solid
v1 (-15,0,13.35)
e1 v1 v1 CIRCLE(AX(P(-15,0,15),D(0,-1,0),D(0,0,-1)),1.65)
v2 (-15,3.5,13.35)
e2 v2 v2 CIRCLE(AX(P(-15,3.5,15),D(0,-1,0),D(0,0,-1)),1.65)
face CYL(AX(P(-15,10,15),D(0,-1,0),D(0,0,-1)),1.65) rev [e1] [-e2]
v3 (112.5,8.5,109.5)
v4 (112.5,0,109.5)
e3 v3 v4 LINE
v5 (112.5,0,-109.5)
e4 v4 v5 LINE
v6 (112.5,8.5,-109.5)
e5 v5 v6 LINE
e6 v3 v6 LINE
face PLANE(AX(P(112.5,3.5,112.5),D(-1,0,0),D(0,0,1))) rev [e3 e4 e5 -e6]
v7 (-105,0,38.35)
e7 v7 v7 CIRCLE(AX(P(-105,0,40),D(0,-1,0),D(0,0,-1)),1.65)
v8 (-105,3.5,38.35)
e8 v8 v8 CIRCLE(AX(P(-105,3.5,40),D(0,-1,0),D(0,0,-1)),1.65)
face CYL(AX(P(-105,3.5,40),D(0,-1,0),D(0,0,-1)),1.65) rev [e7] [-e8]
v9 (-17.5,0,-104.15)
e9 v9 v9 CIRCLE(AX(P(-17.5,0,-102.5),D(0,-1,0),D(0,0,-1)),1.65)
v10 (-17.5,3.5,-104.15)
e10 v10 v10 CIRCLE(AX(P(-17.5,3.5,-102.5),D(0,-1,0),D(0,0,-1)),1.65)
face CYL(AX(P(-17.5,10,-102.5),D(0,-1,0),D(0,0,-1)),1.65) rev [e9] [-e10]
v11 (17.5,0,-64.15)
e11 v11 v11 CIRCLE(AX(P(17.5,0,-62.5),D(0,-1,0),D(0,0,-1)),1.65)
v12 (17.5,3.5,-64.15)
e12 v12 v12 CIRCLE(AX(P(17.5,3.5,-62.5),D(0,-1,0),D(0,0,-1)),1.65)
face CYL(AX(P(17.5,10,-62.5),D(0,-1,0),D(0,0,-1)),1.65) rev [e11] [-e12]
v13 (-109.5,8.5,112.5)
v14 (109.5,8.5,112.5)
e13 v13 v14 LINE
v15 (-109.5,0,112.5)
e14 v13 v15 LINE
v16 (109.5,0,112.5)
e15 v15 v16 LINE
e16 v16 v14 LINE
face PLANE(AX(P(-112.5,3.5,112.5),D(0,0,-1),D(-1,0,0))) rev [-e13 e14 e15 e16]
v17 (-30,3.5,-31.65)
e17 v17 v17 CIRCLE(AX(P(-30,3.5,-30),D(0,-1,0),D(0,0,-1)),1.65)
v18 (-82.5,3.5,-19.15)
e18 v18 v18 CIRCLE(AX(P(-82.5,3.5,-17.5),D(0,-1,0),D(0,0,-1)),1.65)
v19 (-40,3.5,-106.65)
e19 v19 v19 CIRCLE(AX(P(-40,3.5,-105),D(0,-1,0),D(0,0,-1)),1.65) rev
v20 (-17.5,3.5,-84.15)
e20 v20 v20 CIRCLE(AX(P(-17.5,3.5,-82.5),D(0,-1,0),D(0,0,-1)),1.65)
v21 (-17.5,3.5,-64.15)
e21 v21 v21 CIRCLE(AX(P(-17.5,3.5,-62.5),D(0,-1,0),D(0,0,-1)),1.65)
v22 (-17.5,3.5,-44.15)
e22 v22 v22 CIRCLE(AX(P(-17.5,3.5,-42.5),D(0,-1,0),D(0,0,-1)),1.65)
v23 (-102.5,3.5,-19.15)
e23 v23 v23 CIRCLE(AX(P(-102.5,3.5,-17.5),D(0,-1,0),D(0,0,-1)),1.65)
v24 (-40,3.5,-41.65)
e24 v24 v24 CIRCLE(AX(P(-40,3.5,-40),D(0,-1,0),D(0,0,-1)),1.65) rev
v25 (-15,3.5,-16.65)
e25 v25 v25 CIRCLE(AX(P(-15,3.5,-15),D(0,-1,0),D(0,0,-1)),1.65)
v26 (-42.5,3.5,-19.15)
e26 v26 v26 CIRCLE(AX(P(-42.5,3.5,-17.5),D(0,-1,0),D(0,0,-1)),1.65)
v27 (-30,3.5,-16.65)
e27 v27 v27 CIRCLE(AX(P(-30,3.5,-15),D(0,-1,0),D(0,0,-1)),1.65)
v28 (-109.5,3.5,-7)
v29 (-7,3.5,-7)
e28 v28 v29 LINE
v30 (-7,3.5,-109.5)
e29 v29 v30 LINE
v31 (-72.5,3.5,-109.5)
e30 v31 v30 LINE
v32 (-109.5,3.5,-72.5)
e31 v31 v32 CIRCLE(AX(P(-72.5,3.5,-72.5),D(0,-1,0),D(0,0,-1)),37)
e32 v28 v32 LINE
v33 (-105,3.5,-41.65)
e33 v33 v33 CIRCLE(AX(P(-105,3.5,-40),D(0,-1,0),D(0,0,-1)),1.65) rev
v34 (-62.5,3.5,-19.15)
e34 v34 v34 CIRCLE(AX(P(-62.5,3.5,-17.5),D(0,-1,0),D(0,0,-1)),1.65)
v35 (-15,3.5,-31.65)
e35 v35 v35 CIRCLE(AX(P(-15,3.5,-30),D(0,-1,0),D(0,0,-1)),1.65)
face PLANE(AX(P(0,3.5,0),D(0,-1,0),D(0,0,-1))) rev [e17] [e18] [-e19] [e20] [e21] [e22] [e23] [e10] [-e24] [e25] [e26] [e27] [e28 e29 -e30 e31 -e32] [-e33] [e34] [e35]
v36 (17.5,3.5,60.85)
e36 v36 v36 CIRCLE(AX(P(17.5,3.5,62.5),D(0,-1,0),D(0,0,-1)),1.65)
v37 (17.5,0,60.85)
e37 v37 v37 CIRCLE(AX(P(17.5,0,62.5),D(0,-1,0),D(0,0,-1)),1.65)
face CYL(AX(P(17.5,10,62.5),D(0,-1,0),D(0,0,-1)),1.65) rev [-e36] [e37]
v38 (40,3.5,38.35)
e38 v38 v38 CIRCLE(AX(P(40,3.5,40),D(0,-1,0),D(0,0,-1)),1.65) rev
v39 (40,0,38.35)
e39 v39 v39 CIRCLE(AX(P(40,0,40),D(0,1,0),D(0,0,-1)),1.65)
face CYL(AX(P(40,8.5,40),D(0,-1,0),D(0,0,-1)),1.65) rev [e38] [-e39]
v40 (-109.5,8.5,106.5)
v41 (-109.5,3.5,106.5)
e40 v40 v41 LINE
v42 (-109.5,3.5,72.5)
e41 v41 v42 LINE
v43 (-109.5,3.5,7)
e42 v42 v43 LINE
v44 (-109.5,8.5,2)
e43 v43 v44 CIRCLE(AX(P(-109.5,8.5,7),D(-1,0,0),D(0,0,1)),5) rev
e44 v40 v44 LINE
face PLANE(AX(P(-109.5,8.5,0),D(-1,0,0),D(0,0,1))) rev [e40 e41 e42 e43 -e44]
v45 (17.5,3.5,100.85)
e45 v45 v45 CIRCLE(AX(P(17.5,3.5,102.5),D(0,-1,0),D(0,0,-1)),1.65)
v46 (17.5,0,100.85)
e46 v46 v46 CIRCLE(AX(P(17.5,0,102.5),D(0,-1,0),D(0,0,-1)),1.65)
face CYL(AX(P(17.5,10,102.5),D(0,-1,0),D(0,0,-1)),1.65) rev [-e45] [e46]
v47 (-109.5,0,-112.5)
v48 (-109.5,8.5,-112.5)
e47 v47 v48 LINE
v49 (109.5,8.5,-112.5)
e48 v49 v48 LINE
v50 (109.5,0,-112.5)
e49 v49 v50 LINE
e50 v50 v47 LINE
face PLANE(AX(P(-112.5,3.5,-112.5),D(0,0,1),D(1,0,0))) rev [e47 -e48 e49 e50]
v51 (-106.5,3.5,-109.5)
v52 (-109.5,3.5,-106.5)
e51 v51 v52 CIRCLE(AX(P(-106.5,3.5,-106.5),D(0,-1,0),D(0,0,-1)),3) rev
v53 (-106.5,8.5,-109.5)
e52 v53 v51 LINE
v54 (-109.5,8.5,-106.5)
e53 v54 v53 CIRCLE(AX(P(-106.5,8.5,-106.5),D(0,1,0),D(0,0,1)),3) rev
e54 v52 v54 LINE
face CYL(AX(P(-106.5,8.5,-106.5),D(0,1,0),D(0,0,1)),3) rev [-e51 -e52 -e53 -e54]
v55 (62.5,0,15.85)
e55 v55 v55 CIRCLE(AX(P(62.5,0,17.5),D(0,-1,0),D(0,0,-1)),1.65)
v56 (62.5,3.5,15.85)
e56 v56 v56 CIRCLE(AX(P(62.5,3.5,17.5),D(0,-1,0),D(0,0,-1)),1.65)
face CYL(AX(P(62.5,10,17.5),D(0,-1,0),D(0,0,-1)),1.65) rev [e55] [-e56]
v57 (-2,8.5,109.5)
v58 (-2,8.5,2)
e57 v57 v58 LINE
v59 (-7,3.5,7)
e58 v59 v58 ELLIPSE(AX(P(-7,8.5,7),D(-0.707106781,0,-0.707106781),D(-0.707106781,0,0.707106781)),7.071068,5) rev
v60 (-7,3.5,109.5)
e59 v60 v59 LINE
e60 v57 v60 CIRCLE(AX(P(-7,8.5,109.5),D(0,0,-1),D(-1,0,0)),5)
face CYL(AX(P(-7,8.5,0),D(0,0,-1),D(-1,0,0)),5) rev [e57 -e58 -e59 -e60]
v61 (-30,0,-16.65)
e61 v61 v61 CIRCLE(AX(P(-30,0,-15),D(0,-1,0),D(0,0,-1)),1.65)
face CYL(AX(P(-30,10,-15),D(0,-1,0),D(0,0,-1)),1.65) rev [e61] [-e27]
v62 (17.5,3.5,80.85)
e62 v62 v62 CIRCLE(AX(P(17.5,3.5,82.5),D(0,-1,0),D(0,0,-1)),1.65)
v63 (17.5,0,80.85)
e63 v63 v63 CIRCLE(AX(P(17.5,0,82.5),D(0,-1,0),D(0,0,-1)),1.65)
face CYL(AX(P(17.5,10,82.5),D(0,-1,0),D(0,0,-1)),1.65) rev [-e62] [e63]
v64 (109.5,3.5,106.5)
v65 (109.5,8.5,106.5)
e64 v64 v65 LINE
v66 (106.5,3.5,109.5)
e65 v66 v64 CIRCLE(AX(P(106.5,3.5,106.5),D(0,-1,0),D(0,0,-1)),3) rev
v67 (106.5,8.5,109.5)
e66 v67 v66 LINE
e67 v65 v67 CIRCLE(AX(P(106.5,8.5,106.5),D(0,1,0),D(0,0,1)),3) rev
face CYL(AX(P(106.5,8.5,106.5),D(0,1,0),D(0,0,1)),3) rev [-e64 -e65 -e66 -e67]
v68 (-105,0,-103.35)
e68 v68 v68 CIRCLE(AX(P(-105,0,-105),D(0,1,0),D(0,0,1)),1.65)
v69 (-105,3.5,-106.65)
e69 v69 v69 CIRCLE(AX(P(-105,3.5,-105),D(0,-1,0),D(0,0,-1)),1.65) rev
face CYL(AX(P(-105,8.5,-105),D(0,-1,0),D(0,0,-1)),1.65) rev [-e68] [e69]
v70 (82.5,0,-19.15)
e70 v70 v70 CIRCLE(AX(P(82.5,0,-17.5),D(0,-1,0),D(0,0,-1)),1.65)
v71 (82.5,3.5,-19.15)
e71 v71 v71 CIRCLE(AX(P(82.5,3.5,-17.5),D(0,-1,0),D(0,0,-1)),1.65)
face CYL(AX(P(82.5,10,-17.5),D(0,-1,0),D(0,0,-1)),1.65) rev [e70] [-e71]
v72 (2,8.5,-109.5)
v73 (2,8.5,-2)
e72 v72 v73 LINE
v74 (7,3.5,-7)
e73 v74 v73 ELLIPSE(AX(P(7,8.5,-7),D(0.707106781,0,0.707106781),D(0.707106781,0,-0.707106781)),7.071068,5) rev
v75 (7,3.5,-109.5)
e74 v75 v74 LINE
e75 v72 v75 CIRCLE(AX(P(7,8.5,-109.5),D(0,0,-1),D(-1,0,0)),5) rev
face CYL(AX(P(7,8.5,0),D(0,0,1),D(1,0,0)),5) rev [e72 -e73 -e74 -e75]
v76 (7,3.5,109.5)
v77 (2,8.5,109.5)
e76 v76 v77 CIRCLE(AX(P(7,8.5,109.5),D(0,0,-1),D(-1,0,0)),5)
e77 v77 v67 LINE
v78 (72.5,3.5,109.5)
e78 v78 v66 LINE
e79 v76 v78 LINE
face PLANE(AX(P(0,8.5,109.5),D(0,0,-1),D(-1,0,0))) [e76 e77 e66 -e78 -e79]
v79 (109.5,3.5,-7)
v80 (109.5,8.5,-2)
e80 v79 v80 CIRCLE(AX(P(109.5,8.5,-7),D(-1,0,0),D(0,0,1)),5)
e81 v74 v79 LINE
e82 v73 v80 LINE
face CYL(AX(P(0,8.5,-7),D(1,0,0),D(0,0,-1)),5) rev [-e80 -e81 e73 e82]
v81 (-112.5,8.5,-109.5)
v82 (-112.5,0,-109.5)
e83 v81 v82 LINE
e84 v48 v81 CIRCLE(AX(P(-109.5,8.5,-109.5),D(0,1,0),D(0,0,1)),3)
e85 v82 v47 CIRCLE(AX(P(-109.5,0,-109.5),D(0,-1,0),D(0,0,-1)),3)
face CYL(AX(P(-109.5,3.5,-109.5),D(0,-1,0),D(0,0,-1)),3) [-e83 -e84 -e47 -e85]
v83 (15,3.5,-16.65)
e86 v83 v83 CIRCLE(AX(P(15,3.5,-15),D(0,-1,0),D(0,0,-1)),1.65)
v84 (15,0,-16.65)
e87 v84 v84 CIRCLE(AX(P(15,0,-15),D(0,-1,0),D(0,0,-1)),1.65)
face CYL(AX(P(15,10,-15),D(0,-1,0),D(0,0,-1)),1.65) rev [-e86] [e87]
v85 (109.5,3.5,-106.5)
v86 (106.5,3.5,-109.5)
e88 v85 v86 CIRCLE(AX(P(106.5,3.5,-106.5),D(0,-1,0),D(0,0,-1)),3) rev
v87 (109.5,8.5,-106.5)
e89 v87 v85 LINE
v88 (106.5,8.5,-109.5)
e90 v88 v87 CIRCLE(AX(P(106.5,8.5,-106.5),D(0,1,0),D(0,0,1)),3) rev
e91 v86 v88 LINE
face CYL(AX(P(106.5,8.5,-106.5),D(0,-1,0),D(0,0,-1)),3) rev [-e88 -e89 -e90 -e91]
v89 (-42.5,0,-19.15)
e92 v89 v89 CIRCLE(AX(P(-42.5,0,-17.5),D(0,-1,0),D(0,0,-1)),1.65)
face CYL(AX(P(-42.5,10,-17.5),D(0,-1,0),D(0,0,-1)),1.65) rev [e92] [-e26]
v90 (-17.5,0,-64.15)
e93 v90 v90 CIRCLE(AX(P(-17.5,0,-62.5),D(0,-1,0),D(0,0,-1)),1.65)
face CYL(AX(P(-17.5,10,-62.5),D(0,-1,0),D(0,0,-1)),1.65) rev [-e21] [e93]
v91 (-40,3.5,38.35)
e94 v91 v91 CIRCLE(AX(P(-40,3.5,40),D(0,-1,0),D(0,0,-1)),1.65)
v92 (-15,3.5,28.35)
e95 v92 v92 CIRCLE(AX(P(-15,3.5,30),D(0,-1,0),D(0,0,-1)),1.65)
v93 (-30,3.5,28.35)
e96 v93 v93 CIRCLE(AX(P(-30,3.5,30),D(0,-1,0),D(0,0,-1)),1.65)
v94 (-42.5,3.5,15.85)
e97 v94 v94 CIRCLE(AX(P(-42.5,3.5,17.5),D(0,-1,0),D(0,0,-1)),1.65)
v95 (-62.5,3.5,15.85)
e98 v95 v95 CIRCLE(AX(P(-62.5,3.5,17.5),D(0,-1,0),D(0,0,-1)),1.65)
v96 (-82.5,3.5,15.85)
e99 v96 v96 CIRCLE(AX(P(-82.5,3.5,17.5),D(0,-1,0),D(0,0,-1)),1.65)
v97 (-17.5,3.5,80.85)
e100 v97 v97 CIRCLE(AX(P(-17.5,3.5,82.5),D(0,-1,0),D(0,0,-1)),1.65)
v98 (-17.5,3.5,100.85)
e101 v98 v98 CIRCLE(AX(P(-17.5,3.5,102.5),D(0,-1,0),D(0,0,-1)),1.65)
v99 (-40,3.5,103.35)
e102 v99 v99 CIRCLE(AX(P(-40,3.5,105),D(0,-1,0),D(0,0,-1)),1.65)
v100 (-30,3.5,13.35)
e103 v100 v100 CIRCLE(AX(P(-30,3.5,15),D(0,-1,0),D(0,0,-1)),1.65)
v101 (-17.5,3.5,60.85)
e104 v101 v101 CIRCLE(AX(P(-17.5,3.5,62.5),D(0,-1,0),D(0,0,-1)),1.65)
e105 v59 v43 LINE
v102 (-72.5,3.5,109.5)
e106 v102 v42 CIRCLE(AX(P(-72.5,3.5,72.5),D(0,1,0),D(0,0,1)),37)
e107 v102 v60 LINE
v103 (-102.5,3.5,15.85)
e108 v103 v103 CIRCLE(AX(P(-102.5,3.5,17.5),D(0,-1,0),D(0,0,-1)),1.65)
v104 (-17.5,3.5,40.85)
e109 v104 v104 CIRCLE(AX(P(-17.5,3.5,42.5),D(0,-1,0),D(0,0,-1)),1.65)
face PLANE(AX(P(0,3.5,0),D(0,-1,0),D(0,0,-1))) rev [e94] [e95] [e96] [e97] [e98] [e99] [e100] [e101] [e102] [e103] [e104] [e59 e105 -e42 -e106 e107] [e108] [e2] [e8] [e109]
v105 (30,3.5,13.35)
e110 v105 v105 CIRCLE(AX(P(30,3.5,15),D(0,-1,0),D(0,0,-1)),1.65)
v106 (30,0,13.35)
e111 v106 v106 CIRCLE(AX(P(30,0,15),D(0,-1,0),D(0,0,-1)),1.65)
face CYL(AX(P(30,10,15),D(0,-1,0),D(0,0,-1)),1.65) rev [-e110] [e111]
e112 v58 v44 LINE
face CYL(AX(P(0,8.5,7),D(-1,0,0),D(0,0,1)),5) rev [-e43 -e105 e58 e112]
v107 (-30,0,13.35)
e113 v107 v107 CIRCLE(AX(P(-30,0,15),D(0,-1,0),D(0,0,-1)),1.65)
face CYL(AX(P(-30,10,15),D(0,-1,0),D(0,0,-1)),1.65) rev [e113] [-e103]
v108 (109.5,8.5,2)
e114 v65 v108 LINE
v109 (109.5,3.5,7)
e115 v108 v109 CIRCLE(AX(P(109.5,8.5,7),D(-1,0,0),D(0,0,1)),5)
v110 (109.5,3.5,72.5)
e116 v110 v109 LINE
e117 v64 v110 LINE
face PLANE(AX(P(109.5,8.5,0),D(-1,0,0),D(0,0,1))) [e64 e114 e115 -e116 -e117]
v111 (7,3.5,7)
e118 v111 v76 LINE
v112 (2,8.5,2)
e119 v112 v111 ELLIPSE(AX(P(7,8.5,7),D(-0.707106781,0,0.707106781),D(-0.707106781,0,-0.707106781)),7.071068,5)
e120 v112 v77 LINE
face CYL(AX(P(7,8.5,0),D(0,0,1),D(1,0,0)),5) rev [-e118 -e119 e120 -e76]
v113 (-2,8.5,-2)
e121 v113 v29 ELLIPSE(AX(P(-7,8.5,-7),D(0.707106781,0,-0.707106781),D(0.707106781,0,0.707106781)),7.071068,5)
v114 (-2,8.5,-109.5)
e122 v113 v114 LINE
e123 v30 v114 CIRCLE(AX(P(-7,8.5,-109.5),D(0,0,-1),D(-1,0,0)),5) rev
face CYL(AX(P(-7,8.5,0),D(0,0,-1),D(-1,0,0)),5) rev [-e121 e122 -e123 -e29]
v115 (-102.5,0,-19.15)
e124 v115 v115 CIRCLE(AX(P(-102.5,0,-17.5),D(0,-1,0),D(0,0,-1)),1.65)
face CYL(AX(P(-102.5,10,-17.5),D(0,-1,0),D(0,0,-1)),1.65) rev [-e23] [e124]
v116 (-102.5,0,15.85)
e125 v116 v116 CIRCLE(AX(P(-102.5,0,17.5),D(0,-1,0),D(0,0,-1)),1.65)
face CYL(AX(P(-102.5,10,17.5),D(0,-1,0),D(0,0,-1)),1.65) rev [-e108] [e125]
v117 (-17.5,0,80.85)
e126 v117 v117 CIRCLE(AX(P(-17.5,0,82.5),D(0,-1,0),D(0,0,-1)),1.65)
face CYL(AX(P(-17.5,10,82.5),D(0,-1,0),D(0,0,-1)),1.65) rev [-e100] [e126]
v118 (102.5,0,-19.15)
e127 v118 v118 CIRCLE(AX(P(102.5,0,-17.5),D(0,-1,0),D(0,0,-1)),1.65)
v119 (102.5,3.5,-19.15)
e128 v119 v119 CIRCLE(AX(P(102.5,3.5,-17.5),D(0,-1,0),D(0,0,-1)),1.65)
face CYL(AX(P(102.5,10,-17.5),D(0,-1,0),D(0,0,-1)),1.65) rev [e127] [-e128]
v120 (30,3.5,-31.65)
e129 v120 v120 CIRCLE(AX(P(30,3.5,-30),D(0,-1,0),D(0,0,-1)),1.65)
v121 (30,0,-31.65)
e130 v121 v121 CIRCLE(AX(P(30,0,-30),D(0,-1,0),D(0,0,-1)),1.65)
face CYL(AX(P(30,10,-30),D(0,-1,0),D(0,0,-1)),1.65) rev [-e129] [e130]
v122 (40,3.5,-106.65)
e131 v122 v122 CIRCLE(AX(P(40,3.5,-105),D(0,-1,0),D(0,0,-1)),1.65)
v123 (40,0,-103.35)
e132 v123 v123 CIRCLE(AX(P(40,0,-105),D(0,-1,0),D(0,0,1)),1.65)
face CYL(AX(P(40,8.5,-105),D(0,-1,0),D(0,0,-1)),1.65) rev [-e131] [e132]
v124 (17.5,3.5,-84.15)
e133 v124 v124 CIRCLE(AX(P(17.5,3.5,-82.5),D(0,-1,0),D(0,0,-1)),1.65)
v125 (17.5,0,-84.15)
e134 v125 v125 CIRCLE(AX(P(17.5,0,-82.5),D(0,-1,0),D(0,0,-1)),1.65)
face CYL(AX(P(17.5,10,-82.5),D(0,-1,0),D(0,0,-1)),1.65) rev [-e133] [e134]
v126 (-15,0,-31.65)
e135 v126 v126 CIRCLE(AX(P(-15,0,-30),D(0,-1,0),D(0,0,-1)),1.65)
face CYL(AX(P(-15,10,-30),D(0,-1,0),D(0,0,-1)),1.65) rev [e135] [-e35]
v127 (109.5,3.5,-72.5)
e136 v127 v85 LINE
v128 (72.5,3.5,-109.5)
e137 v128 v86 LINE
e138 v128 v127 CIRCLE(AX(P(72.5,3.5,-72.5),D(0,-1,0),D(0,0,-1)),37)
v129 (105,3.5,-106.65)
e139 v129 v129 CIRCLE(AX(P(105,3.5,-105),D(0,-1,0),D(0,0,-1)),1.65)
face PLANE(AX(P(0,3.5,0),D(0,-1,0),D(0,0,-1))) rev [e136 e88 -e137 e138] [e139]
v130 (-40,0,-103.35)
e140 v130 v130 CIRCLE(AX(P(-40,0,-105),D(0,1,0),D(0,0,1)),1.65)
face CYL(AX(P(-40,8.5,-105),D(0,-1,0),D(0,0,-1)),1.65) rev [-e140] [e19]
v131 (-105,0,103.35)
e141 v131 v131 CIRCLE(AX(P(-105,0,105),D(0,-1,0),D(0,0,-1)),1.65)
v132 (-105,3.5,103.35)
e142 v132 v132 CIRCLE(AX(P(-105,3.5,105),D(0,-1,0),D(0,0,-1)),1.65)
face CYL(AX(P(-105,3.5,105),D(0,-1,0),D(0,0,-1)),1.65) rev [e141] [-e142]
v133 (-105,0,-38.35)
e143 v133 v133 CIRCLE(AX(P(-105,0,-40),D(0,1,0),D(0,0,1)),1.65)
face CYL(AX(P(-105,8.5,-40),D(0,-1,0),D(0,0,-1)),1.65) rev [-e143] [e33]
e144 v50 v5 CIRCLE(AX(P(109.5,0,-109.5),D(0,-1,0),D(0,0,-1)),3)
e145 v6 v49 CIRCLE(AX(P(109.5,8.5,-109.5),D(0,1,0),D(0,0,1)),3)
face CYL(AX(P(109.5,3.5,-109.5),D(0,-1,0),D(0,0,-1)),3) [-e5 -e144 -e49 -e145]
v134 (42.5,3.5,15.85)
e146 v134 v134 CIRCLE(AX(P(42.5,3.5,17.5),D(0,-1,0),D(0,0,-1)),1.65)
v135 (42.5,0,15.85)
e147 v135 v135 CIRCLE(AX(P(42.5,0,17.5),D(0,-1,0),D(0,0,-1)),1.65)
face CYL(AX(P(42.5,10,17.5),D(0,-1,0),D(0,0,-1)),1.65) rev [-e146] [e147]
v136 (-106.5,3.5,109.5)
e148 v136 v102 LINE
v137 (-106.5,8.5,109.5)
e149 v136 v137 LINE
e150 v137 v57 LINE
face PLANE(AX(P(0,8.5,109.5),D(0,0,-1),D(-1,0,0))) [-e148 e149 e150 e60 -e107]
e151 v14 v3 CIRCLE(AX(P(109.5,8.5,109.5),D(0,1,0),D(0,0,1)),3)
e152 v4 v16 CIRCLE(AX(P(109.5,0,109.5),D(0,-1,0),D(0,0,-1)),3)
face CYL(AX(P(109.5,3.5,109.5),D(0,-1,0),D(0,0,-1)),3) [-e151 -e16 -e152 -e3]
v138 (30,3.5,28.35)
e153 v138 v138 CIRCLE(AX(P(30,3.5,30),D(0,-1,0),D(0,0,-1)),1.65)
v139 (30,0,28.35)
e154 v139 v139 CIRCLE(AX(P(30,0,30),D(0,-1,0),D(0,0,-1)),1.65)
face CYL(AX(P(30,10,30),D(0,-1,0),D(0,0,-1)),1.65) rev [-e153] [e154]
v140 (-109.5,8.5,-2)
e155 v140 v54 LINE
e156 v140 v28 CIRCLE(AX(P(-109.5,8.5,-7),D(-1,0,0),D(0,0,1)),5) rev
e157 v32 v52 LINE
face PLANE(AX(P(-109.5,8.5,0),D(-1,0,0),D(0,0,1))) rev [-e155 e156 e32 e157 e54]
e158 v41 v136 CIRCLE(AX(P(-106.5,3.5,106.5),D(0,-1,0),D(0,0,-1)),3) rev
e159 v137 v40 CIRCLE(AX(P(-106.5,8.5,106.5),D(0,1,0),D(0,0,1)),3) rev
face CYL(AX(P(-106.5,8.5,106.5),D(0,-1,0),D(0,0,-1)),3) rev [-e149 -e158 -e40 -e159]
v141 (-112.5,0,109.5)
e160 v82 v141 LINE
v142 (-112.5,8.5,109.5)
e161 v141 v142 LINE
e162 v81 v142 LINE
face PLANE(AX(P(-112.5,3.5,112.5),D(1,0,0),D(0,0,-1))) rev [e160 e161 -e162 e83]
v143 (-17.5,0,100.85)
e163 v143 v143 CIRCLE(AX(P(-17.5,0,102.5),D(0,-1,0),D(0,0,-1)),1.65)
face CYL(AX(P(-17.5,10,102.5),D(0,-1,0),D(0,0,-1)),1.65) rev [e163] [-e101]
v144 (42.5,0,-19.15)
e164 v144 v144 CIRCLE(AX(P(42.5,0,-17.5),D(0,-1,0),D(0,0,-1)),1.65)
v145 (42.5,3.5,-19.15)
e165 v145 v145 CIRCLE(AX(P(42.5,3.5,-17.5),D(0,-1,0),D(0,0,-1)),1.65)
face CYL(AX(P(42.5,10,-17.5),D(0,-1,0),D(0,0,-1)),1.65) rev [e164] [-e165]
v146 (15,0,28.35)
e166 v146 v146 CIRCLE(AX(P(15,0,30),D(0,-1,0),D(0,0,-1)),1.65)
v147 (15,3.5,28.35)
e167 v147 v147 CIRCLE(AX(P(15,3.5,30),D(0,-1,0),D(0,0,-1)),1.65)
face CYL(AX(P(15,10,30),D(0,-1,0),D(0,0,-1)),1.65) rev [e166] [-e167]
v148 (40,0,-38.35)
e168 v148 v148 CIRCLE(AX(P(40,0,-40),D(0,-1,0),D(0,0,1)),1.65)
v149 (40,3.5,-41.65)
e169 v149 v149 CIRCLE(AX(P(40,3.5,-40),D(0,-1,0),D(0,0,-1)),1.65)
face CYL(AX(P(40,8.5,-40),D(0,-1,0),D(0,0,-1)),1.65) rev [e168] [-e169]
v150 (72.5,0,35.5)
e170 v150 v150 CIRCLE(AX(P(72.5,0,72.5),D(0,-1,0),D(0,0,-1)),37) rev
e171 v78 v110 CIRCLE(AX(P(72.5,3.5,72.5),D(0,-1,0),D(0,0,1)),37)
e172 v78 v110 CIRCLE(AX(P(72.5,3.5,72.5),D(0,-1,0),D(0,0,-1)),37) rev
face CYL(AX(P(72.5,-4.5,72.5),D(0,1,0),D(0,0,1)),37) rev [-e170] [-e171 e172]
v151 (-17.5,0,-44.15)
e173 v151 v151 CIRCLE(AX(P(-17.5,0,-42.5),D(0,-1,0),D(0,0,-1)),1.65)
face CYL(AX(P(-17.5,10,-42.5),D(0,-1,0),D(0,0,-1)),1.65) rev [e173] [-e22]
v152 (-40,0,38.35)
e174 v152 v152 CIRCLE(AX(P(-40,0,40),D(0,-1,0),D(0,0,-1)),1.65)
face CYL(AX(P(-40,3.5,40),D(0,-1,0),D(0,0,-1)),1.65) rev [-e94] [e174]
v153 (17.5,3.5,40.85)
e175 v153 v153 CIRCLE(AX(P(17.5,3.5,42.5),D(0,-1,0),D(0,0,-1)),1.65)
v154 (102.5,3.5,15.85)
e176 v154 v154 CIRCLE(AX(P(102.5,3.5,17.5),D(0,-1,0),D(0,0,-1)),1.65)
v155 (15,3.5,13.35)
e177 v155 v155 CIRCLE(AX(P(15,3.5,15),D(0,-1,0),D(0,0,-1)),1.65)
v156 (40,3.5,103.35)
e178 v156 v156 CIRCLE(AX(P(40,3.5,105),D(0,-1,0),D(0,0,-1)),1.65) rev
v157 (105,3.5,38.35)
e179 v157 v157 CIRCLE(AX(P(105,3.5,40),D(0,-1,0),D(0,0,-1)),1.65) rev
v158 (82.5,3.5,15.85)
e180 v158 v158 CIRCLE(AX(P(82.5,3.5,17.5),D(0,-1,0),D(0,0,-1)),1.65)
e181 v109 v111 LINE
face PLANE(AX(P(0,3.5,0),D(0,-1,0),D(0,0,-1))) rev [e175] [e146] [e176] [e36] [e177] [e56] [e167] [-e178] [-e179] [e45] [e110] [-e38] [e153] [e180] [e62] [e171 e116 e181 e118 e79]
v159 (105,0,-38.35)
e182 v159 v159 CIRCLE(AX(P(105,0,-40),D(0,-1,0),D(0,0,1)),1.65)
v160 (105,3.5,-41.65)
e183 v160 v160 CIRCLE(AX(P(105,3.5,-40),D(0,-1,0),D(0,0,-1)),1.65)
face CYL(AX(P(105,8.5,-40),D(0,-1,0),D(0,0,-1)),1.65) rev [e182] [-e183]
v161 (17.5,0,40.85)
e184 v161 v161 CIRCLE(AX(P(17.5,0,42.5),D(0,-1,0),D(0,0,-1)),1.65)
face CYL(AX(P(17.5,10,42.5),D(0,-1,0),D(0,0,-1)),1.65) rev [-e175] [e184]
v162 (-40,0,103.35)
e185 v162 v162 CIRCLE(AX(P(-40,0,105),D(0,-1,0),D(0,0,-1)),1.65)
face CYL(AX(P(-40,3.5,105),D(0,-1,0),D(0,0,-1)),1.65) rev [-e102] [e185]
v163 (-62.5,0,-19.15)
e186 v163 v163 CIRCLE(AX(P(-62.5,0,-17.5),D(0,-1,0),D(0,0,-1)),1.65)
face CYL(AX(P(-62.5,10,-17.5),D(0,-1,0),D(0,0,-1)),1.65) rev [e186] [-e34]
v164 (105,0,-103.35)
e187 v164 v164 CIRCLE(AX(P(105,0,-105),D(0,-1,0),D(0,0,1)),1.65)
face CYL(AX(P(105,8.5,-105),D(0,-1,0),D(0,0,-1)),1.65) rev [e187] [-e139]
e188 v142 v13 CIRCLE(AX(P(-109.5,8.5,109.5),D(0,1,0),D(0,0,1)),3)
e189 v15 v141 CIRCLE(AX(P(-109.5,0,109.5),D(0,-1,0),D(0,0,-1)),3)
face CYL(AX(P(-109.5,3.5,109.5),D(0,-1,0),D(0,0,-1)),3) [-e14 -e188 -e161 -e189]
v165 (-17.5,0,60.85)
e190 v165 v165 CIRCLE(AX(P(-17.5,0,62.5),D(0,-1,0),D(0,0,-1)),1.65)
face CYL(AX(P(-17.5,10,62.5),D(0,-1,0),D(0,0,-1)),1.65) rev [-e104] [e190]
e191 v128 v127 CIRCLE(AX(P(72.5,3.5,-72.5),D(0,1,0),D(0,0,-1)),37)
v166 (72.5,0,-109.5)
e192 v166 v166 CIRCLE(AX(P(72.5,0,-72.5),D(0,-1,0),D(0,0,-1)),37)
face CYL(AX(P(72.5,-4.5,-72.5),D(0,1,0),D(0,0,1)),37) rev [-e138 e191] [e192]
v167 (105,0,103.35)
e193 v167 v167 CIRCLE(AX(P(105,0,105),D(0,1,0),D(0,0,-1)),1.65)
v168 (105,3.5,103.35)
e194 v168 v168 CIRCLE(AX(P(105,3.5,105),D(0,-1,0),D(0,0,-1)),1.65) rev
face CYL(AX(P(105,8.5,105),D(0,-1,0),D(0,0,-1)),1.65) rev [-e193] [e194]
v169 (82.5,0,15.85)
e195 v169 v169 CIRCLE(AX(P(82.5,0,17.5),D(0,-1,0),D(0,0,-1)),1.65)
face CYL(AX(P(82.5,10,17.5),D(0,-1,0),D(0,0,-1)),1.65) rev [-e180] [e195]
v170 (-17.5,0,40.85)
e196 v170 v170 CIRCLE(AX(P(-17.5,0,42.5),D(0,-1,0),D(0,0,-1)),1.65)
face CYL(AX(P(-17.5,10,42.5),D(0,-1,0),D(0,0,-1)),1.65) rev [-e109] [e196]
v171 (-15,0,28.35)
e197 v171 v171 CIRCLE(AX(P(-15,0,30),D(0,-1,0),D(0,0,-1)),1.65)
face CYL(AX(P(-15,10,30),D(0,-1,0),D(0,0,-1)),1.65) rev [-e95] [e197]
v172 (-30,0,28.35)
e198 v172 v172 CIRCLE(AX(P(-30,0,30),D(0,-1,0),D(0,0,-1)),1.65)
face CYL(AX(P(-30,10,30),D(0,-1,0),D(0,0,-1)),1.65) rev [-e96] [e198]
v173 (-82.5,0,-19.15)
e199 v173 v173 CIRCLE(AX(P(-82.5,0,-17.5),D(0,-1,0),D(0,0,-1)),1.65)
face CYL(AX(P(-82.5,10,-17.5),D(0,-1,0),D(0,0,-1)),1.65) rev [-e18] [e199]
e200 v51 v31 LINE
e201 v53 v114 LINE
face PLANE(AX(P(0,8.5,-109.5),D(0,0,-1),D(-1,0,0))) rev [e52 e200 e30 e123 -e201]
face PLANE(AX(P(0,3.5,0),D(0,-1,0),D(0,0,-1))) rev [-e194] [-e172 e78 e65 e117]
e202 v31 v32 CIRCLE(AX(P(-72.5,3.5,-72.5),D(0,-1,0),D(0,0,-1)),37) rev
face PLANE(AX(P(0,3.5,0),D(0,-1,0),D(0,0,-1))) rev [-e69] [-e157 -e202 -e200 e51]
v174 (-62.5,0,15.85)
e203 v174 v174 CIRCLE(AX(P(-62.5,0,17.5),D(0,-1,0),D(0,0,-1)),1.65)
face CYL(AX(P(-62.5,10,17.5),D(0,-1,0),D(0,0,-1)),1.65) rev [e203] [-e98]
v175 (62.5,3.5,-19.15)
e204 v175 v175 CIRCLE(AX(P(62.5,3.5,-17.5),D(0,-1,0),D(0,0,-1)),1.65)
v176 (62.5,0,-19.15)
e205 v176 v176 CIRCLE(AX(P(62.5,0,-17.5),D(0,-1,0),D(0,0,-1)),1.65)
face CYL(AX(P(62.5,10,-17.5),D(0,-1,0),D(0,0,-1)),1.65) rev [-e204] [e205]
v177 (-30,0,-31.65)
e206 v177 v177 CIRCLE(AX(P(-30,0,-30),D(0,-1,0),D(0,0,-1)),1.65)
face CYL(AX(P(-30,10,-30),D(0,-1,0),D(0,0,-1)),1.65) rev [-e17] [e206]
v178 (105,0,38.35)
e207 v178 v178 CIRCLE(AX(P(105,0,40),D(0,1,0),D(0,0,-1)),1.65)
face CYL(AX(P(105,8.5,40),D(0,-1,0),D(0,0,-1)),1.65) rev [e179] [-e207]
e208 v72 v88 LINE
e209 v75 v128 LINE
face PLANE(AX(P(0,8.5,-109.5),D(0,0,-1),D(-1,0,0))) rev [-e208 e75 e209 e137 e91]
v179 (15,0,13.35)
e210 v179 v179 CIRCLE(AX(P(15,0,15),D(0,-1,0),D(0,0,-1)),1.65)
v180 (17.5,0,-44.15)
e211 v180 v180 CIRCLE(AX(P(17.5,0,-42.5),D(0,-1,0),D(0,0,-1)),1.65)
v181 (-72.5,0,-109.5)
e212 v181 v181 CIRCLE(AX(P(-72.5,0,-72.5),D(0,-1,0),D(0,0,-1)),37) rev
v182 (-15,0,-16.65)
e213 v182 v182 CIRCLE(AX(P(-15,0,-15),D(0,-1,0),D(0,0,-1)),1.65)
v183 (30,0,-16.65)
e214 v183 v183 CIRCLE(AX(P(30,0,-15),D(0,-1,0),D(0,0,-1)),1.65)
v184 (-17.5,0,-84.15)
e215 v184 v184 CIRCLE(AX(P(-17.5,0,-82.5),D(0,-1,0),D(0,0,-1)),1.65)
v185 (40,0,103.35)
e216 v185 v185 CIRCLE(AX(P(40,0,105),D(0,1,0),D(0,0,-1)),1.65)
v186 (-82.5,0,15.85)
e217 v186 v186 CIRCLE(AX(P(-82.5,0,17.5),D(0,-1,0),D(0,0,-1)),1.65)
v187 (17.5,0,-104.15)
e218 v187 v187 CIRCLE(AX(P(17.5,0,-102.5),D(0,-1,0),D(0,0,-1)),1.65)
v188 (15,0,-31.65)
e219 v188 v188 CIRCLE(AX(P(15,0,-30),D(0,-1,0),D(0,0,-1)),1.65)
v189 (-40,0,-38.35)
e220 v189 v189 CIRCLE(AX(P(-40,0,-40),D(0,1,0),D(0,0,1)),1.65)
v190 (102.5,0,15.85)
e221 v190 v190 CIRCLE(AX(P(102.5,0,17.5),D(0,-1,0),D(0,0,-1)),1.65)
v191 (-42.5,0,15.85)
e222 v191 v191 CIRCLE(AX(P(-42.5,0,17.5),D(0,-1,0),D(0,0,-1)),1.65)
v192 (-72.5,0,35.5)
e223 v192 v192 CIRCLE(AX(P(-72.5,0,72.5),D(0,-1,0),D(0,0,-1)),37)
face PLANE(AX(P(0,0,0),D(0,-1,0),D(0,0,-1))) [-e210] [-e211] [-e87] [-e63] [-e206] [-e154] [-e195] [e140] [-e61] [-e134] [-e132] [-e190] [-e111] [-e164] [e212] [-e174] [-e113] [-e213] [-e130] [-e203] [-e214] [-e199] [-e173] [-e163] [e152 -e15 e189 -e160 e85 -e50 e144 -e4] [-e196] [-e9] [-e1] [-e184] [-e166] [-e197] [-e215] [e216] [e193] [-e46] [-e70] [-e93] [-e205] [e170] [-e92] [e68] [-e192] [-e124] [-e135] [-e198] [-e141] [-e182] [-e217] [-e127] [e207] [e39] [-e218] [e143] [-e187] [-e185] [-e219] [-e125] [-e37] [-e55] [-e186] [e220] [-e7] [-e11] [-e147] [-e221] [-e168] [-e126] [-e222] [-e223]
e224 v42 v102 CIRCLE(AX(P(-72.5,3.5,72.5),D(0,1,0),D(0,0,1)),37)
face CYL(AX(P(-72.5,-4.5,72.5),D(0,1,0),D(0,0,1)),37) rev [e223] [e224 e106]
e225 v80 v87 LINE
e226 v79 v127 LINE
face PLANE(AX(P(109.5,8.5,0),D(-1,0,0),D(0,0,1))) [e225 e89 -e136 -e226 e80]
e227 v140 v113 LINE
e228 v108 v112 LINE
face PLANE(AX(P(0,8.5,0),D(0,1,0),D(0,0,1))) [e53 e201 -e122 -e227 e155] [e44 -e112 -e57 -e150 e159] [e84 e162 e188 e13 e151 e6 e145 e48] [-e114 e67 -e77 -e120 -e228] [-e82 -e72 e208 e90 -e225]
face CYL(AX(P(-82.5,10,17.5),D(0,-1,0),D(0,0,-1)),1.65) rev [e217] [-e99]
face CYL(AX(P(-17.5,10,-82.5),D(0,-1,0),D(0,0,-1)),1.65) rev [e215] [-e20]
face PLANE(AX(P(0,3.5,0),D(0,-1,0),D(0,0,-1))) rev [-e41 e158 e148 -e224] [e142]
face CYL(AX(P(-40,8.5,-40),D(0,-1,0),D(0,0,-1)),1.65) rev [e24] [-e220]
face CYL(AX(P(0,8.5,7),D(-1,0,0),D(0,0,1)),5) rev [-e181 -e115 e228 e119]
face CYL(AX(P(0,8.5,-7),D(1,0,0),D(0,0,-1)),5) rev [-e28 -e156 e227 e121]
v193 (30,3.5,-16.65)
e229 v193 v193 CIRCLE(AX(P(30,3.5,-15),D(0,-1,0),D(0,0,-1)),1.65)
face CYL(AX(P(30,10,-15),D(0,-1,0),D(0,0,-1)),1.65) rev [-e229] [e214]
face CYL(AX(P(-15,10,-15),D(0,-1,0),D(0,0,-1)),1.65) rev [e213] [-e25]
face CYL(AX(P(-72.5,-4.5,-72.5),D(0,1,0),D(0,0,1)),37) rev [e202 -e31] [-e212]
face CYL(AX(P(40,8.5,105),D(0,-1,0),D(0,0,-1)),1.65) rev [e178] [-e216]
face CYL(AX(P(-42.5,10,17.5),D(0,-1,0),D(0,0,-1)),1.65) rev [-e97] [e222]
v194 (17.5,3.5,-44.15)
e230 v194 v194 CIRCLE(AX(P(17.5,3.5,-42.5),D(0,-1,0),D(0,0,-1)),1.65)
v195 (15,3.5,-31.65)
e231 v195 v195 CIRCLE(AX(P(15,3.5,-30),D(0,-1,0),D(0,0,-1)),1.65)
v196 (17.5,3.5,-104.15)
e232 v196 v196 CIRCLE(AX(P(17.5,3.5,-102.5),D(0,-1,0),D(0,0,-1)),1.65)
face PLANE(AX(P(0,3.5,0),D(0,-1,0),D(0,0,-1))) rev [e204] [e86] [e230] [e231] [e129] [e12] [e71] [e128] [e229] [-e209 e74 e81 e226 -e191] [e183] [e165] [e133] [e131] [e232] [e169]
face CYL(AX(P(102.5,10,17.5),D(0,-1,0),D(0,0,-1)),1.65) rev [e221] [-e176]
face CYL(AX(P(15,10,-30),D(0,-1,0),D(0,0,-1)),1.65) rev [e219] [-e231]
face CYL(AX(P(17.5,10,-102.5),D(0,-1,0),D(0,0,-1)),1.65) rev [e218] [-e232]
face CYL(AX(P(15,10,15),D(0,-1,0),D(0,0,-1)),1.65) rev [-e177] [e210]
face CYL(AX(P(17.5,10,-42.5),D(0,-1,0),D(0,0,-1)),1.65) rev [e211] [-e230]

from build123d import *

# Parameters (mm, degrees)
SKETCH_1_W               = 225
SKETCH_1_H               = 225
EXTRUDE_1_DEPTH          = 3.5
SKETCH_2_R               = 37
CUT_EXTRUDE_1_DEPTH      = 8
SKETCH_4_R               = 1.65
CUT_EXTRUDE_2_DEPTH      = 160.137519146
SKETCH_3_W               = 225
SKETCH_3_H               = 225
SKETCH_3_W_2             = 219
SKETCH_3_H_2             = 219
EXTRUDE_1975_DEPTH       = 5
SKETCH_5_R               = 1.65
CUT_EXTRUDE_2992_DEPTH   = 10
MIRROR_2_COPY_1_SKETCH_R = 37
MIRROR_2_COPY_1_DEPTH    = 8
MIRROR_2_COPY_2_SKETCH_R = 1.65
MIRROR_2_COPY_2_DEPTH    = 160.137519146
FILLET_1_R               = 5
FILLET_2_R               = 3
SKETCH_6_R               = 1.65
CUT_EXTRUDE_3_DEPTH      = 10


with BuildPart() as part:
    # 草图1 → 凸台-拉伸1 (new body)
    with BuildSketch(Plane(origin=(0, 0, 0), x_dir=(1, 0, 0), z_dir=(0, 1, 0))):
        Rectangle(SKETCH_1_W, SKETCH_1_H)
    extrude(amount=EXTRUDE_1_DEPTH)

    # 草图2 → 切除-拉伸1 (cut)
    with BuildSketch(Plane(origin=(0, 3.5, 0), x_dir=(1, 0, 0), z_dir=(0, 1, 0))):
        with Locations(Location((-72.5, -72.5, 0), (0, 0, 270))):
            Circle(SKETCH_2_R)
    cut_extrude_1 = extrude(amount=-CUT_EXTRUDE_1_DEPTH, mode=Mode.SUBTRACT)

    # 草图4 → 切除-拉伸2 (cut, through all)
    with BuildSketch(Plane.XZ):
        with Locations(Location((-40, 40, 0), (0, 0, 270))):
            Circle(SKETCH_4_R)
        with Locations(Location((-105, 40, 0), (0, 0, 270))):
            Circle(SKETCH_4_R)
        with Locations(Location((-105, 105, 0), (0, 0, 270))):
            Circle(SKETCH_4_R)
        with Locations(Location((-40, 105, 0), (0, 0, 270))):
            Circle(SKETCH_4_R)
    cut_extrude_2 = extrude(amount=-CUT_EXTRUDE_2_DEPTH, mode=Mode.SUBTRACT)

    # 草图3 → Extrude 1975 (add)
    # profile 1 of 2: a face of its own
    with BuildSketch(Plane(origin=(0, 3.5, 0), x_dir=(1, 0, 0), z_dir=(0, 1, 0))):
        Rectangle(SKETCH_3_W, SKETCH_3_H)
        Rectangle(SKETCH_3_W_2, SKETCH_3_H_2, mode=Mode.SUBTRACT)
    # profile 2 of 2: a face of its own
    with BuildSketch(Plane(origin=(0, 3.5, 0), x_dir=(1, 0, 0), z_dir=(0, 1, 0))):
        Polygon((2, 109.5), (2, 2), (109.5, 2), (109.5, -2), (2, -2), (2, -109.5), (-2, -109.5), (-2, -2), (-109.5, -2), (-109.5, 2), (-2, 2), (-2, 109.5), align=None)
    extrude(amount=EXTRUDE_1975_DEPTH)

    # 草图5 → Cut-Extrude 2992 (cut)
    with BuildSketch(Plane.XZ):
        with Locations(Location((-102.5, 17.5, 0), (0, 0, 270))):
            Circle(SKETCH_5_R)
        with Locations(Location((-102.5, -17.5, 0), (0, 0, 270))):
            Circle(SKETCH_5_R)
        with Locations(Location((-82.5, 17.5, 0), (0, 0, 270))):
            Circle(SKETCH_5_R)
        with Locations(Location((-82.5, -17.5, 0), (0, 0, 270))):
            Circle(SKETCH_5_R)
        with Locations(Location((-62.5, 17.5, 0), (0, 0, 270))):
            Circle(SKETCH_5_R)
        with Locations(Location((-62.5, -17.5, 0), (0, 0, 270))):
            Circle(SKETCH_5_R)
        with Locations(Location((-42.5, 17.5, 0), (0, 0, 270))):
            Circle(SKETCH_5_R)
        with Locations(Location((-42.5, -17.5, 0), (0, 0, 270))):
            Circle(SKETCH_5_R)
        with Locations(Location((17.5, 42.5, 0), (0, 0, 270))):
            Circle(SKETCH_5_R)
        with Locations(Location((-17.5, 42.5, 0), (0, 0, 270))):
            Circle(SKETCH_5_R)
        with Locations(Location((-17.5, 62.5, 0), (0, 0, 270))):
            Circle(SKETCH_5_R)
        with Locations(Location((17.5, 62.5, 0), (0, 0, 270))):
            Circle(SKETCH_5_R)
        with Locations(Location((17.5, 82.5, 0), (0, 0, 270))):
            Circle(SKETCH_5_R)
        with Locations(Location((-17.5, 82.5, 0), (0, 0, 270))):
            Circle(SKETCH_5_R)
        with Locations(Location((-17.5, 102.5, 0), (0, 0, 270))):
            Circle(SKETCH_5_R)
        with Locations(Location((17.5, 102.5, 0), (0, 0, 270))):
            Circle(SKETCH_5_R)
        with Locations(Location((42.5, -17.5, 0), (0, 0, 270))):
            Circle(SKETCH_5_R)
        with Locations(Location((42.5, 17.5, 0), (0, 0, 270))):
            Circle(SKETCH_5_R)
        with Locations(Location((62.5, 17.5, 0), (0, 0, 270))):
            Circle(SKETCH_5_R)
        with Locations(Location((62.5, -17.5, 0), (0, 0, 270))):
            Circle(SKETCH_5_R)
        with Locations(Location((82.5, -17.5, 0), (0, 0, 270))):
            Circle(SKETCH_5_R)
        with Locations(Location((82.5, 17.5, 0), (0, 0, 270))):
            Circle(SKETCH_5_R)
        with Locations(Location((102.5, 17.5, 0), (0, 0, 270))):
            Circle(SKETCH_5_R)
        with Locations(Location((102.5, -17.5, 0), (0, 0, 270))):
            Circle(SKETCH_5_R)
        with Locations(Location((-17.5, -42.5, 0), (0, 0, 270))):
            Circle(SKETCH_5_R)
        with Locations(Location((17.5, -42.5, 0), (0, 0, 270))):
            Circle(SKETCH_5_R)
        with Locations(Location((17.5, -62.5, 0), (0, 0, 270))):
            Circle(SKETCH_5_R)
        with Locations(Location((-17.5, -62.5, 0), (0, 0, 270))):
            Circle(SKETCH_5_R)
        with Locations(Location((-17.5, -82.5, 0), (0, 0, 270))):
            Circle(SKETCH_5_R)
        with Locations(Location((17.5, -82.5, 0), (0, 0, 270))):
            Circle(SKETCH_5_R)
        with Locations(Location((17.5, -102.5, 0), (0, 0, 270))):
            Circle(SKETCH_5_R)
        with Locations(Location((-17.5, -102.5, 0), (0, 0, 270))):
            Circle(SKETCH_5_R)
    extrude(amount=-CUT_EXTRUDE_2992_DEPTH, mode=Mode.SUBTRACT)

    # 镜向1: 切除-拉伸1, 切除-拉伸2 across plane
    add(cut_extrude_1.mirror(Plane(origin=(0, 0, 0), x_dir=(0, 0, 1), z_dir=(1, 0, 0))), mode=Mode.SUBTRACT)
    add(cut_extrude_2.mirror(Plane(origin=(0, 0, 0), x_dir=(0, 0, 1), z_dir=(1, 0, 0))), mode=Mode.SUBTRACT)

    # 镜向2: 切除-拉伸1, 切除-拉伸2 across plane
    add(cut_extrude_1.mirror(Plane.XY), mode=Mode.SUBTRACT)
    add(cut_extrude_2.mirror(Plane.XY), mode=Mode.SUBTRACT)

    # 镜向2 copy 1 sketch → 镜向2 copy 1 (cut)
    with BuildSketch(Plane(origin=(0, 3.5, 0), x_dir=(-1, 0, 0), z_dir=(0, 1, 0))):
        with Locations(Location((-72.5, -72.5, 0), (0, 0, 270))):
            Circle(MIRROR_2_COPY_1_SKETCH_R)
    extrude(amount=-MIRROR_2_COPY_1_DEPTH, mode=Mode.SUBTRACT)

    # 镜向2 copy 2 sketch → 镜向2 copy 2 (cut, through all)
    with BuildSketch(Plane(origin=(0, 0, 0), x_dir=(-1, 0, 0), z_dir=(0, -1, 0))):
        with Locations(Location((-40, 40, 0), (0, 0, 270))):
            Circle(MIRROR_2_COPY_2_SKETCH_R)
        with Locations(Location((-105, 40, 0), (0, 0, 270))):
            Circle(MIRROR_2_COPY_2_SKETCH_R)
        with Locations(Location((-105, 105, 0), (0, 0, 270))):
            Circle(MIRROR_2_COPY_2_SKETCH_R)
        with Locations(Location((-40, 105, 0), (0, 0, 270))):
            Circle(MIRROR_2_COPY_2_SKETCH_R)
    extrude(amount=-MIRROR_2_COPY_2_DEPTH, mode=Mode.SUBTRACT)

    # 圆角1
    fillet_1_edges = [part.edges().sort_by_distance(p)[0] for p in [
        (-55.75, 3.5, -2),
        (55.75, 3.5, -2),
        (55.75, 3.5, 2),
        (-55.75, 3.5, 2),
        (-2, 3.5, 55.75),
        (2, 3.5, 55.75),
        (2, 3.5, -55.75),
        (-2, 3.5, -55.75),
    ]]
    fillet(fillet_1_edges, radius=FILLET_1_R - 0.0001)  # a hair under: the kernel refuses the full size

    # 圆角2
    fillet_2_edges = [part.edges().sort_by_distance(p)[0] for p in [
        (109.5, 6, 109.5),
        (-109.5, 6, 109.5),
        (-109.5, 6, -109.5),
        (109.5, 6, -109.5),
        (112.5, 4.25, 112.5),
        (-112.5, 4.25, 112.5),
        (-112.5, 4.25, -112.5),
        (112.5, 4.25, -112.5),
    ]]
    fillet(fillet_2_edges, radius=FILLET_2_R)

    # 草图6 → 切除-拉伸3 (cut)
    with BuildSketch(Plane.XZ):
        with Locations(Location((-30, 30, 0), (0, 0, 270))):
            Circle(SKETCH_6_R)
        with Locations(Location((-15, 30, 0), (0, 0, 270))):
            Circle(SKETCH_6_R)
        with Locations(Location((15, 30, 0), (0, 0, 270))):
            Circle(SKETCH_6_R)
        with Locations(Location((30, 30, 0), (0, 0, 270))):
            Circle(SKETCH_6_R)
        with Locations(Location((-15, 15, 0), (0, 0, 270))):
            Circle(SKETCH_6_R)
        with Locations(Location((15, 15, 0), (0, 0, 270))):
            Circle(SKETCH_6_R)
        with Locations(Location((30, 15, 0), (0, 0, 270))):
            Circle(SKETCH_6_R)
        with Locations(Location((-15, -15, 0), (0, 0, 270))):
            Circle(SKETCH_6_R)
        with Locations(Location((15, -15, 0), (0, 0, 270))):
            Circle(SKETCH_6_R)
        with Locations(Location((30, -15, 0), (0, 0, 270))):
            Circle(SKETCH_6_R)
        with Locations(Location((-15, -30, 0), (0, 0, 270))):
            Circle(SKETCH_6_R)
        with Locations(Location((15, -30, 0), (0, 0, 270))):
            Circle(SKETCH_6_R)
        with Locations(Location((30, -30, 0), (0, 0, 270))):
            Circle(SKETCH_6_R)
        with Locations(Location((-30, 15, 0), (0, 0, 270))):
            Circle(SKETCH_6_R)
        with Locations(Location((-30, -15, 0), (0, 0, 270))):
            Circle(SKETCH_6_R)
        with Locations(Location((-30, -30, 0), (0, 0, 270))):
            Circle(SKETCH_6_R)
    extrude(amount=-CUT_EXTRUDE_3_DEPTH, mode=Mode.SUBTRACT)


solid = part.part
